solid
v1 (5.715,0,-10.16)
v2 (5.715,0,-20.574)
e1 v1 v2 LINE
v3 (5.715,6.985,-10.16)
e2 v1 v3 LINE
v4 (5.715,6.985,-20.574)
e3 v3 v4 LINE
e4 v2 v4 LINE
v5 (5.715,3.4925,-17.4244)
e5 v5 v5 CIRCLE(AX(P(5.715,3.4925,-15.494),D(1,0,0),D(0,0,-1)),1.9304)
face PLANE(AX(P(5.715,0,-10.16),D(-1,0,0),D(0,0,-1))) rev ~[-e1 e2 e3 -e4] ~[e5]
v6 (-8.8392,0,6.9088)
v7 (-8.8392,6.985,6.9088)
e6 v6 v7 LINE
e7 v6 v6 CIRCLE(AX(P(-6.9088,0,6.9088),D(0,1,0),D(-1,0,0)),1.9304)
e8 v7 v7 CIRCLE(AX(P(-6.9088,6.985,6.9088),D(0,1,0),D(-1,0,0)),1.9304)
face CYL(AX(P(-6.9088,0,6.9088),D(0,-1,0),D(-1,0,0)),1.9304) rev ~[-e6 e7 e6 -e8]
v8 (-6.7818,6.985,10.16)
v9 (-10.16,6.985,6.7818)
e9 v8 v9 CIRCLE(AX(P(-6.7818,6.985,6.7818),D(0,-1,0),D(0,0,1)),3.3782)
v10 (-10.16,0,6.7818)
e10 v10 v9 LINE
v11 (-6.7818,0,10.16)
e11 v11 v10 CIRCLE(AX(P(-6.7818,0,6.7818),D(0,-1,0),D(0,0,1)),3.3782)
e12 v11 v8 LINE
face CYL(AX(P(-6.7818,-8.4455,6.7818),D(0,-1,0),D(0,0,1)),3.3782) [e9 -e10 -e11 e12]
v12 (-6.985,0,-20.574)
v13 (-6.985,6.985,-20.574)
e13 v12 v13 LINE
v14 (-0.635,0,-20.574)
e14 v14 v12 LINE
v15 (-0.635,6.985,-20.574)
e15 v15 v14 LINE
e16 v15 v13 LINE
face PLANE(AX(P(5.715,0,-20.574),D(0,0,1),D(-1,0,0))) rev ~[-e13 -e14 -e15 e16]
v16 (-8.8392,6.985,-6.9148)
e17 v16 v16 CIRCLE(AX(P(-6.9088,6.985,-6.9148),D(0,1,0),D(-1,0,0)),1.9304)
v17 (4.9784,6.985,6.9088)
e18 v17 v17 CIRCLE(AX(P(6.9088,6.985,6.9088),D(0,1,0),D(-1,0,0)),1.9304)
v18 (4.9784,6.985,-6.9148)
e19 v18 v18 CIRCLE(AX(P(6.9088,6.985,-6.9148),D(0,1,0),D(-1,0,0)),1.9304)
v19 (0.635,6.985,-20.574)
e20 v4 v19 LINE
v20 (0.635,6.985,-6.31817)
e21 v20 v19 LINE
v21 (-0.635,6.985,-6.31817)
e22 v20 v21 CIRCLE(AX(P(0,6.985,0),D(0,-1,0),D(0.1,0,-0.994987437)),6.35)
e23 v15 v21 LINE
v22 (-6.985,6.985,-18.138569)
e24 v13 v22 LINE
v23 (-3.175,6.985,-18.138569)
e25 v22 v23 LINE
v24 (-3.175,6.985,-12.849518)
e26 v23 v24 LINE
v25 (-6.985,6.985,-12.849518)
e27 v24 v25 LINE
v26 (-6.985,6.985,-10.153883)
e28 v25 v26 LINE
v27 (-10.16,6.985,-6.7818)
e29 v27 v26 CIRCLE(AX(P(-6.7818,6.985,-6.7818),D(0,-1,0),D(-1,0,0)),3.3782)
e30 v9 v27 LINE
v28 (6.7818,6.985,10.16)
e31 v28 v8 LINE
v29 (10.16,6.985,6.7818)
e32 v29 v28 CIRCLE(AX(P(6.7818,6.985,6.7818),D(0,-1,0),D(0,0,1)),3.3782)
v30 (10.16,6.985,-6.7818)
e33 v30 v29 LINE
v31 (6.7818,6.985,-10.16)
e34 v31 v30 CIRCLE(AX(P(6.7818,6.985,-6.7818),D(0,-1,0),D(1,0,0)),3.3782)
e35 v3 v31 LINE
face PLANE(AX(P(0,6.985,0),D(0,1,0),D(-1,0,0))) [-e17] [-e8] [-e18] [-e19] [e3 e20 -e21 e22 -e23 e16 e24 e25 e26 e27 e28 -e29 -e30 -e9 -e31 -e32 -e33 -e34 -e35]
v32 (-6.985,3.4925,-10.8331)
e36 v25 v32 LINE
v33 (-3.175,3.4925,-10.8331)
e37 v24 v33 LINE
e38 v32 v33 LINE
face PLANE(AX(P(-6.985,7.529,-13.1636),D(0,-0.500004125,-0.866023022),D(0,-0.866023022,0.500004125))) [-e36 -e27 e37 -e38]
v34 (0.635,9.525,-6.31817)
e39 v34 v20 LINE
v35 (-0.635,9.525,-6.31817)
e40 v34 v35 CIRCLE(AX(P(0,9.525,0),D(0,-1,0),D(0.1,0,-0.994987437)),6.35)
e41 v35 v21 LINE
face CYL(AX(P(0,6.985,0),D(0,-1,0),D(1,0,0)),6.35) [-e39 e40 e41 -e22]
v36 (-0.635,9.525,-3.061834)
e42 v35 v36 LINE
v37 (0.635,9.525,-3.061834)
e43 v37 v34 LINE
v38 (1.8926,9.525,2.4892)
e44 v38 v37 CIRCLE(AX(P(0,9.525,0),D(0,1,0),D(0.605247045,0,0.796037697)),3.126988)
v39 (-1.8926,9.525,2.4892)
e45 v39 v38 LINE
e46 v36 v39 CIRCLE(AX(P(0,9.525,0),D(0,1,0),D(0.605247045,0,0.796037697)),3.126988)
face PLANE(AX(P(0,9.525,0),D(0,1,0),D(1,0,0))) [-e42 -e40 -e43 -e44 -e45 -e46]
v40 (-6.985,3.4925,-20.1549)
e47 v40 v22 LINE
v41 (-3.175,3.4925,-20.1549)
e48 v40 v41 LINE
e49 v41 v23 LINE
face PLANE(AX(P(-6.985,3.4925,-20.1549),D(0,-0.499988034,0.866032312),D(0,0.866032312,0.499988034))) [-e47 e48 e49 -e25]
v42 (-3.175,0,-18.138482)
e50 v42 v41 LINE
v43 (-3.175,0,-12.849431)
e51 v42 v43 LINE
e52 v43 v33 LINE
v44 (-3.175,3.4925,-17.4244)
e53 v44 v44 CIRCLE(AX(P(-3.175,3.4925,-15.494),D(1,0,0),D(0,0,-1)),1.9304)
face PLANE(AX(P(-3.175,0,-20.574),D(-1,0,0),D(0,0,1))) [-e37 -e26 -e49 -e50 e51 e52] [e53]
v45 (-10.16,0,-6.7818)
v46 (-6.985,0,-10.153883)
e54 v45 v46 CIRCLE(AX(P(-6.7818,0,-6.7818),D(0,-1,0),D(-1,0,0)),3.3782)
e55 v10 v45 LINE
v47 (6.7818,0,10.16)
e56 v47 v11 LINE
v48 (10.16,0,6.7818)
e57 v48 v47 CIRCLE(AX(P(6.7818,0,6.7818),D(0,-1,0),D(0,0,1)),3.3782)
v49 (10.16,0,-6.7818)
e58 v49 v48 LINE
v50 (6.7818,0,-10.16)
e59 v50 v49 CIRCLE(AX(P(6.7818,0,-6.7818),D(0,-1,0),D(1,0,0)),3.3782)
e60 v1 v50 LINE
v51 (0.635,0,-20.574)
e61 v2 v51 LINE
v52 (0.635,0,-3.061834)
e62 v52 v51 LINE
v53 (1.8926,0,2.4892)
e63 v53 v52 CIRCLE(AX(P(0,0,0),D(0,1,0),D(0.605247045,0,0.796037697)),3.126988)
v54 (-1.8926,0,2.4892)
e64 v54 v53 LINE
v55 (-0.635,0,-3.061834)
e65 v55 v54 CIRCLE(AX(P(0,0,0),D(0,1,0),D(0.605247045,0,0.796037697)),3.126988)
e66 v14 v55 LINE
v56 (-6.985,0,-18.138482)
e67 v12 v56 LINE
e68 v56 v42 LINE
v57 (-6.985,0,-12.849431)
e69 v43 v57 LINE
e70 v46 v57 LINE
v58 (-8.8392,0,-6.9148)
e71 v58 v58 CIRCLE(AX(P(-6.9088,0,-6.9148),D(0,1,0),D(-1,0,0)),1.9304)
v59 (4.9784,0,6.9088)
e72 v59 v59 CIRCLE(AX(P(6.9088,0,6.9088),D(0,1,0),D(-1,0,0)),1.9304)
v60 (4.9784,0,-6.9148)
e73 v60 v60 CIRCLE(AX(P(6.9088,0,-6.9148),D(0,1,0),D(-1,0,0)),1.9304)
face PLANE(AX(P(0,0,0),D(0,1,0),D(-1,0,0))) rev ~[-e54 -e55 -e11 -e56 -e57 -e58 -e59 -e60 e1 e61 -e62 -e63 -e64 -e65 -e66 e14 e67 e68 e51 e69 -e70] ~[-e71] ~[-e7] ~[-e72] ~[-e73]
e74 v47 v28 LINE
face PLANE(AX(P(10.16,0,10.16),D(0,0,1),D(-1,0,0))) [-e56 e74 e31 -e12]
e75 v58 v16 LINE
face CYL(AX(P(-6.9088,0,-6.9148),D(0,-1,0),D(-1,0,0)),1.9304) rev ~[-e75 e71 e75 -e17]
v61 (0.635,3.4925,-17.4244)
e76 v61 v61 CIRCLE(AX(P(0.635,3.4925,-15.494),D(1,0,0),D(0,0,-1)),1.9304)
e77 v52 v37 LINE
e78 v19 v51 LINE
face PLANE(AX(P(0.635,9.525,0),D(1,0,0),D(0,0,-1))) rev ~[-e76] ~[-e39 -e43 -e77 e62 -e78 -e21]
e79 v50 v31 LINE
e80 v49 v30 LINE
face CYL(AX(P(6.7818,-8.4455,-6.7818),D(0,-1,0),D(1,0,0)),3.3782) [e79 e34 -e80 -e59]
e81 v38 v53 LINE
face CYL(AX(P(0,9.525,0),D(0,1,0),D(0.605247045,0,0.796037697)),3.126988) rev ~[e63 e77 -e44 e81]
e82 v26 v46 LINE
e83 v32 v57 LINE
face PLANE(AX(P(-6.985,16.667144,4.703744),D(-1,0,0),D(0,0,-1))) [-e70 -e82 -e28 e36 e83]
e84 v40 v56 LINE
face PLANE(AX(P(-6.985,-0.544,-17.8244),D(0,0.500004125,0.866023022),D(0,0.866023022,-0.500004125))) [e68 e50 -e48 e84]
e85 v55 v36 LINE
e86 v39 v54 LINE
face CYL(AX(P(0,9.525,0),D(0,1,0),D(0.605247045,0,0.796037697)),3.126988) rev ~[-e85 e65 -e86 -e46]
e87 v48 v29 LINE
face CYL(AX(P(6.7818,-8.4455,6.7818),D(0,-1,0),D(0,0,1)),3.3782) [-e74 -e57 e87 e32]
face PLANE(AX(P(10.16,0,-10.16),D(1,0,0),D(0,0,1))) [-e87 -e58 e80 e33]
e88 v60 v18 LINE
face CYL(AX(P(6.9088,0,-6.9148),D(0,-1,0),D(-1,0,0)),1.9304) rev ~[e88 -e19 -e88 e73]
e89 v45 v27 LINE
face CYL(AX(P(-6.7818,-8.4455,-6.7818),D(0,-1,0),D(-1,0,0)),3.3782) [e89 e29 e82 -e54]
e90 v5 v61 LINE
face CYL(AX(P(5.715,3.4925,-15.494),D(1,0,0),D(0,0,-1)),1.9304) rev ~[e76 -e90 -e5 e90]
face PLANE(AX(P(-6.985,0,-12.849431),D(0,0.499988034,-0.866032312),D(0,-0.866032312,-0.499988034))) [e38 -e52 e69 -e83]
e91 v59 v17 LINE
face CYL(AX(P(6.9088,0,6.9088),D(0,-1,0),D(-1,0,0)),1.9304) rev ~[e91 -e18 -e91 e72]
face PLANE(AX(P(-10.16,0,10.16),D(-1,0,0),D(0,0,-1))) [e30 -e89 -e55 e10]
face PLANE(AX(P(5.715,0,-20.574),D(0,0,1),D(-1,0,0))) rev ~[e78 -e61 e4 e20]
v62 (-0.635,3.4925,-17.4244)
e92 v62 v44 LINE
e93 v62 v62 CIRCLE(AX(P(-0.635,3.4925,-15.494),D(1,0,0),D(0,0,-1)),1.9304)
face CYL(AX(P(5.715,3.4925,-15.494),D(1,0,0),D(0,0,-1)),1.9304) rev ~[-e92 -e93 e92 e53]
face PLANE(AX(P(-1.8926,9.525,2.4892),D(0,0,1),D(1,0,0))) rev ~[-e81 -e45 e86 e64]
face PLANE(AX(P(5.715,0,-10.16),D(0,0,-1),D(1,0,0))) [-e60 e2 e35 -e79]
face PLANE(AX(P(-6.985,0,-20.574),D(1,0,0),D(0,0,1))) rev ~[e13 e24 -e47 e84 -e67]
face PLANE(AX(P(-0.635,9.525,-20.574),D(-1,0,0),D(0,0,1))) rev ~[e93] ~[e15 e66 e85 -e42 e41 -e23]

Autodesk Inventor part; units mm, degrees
ref_plane "YZ Plane" through (0, 0, 0) normal (1, 0, 0) x (0, 1, 0)
ref_plane "XZ Plane" through (0, 0, 0) normal (0, 1, 0) x (-1, 0, 0)
ref_plane "XY Plane" through (0, 0, 0) normal (0, 0, 1) x (1, 0, 0)
sketch "Sketch1" plane through (0, 0, 0) normal (0, 1, 0) x (-1, 0, 0)
  line L0 (-10.16, 10.16) -> (10.16, 10.16)
  line L1 (10.16, 10.16) -> (10.16, -10.16)
  line L2 (-10.16, -10.16) -> (-10.16, 10.16)
  circle A0 centre (6.9088, -6.9148) radius 1.9304
  circle A1 centre (6.9088, 6.9088) radius 1.9304
  circle A2 centre (-6.9088, 6.9088) radius 1.9304
  circle A3 centre (-6.9088, -6.9148) radius 1.9304
  line L3 (-5.715, -10.16) -> (-5.715, -20.574)
  line L4 (-5.715, -20.574) -> (6.985, -20.574)
  line L5 (6.985, -20.574) -> (6.985, -10.16)
  line L6 (10.16, -10.16) -> (6.985, -10.16)
  line L7 (-5.715, -10.16) -> (-10.16, -10.16)
  point P0 (0, 0)
  dimension "d0" = 20.32
  dimension "d2" = 10.16
  dimension "d3" = 10.16
  dimension "d4" = 3.8608
  dimension "d5" = 6.9148
  dimension "d6" = 6.9088
  dimension "d7" = 3.8608
  dimension "d8" = 6.9088
  dimension "d9" = 6.9088
  dimension "d10" = 3.8608
  dimension "d11" = 6.9088
  dimension "d12" = 6.9088
  dimension "d13" = 3.8608
  dimension "d14" = 12.7
  dimension "d16" = 6.985
extrude "Extrusion1" add sketch "Sketch1" along normal blind 6.985
sketch "Sketch2" plane through (-6.985, 0, -20.574) normal (-1, 0, 0) x (0, 0, 1)
  circle A0 centre (5.08, 3.4925) radius 4.6609 construction
  line L0 (10.414, 0) -> (0, 0) projected
  line L1 (0, 0) -> (0, 6.985) projected
  line L2 (9.7409, 3.4925) -> (7.4105, -0.544)
  line L3 (7.4105, -0.544) -> (2.7496, -0.544)
  line L4 (2.7496, -0.544) -> (0.4191, 3.4925)
  line L5 (0.4191, 3.4925) -> (2.7495, 7.529)
  line L6 (2.7495, 7.529) -> (7.4104, 7.529)
  line L7 (7.4104, 7.529) -> (9.7409, 3.4925)
  point P0 (20.574, 0)
  dimension "d19" = 9.3218
  dimension "d20" = 3.4925
  dimension "d21" = 5.08
extrude "Extrusion2" cut sketch "Sketch2" against normal blind 3.81
sketch "Sketch3" plane through (5.715, 0, -10.16) normal (1, 0, 0) x (0, 0, -1)
  circle A0 centre (5.334, 3.4925) radius 1.9304
  line L0 (10.414, 0) -> (10.414, 6.985) projected
  line L1 (0, 6.985) -> (10.414, 6.985) projected
  point P0 (-10.16, 0)
  dimension "d24" = 3.8608
  dimension "d25" = 5.08
  dimension "d26" = 3.4925
extrude "Extrusion3" cut sketch "Sketch3" against normal through all
sketch "Sketch4" plane through (0, 6.985, 0) normal (0, 1, 0) x (1, 0, 0)
  circle A0 centre (0, 0) radius 6.35
  dimension "d29" = 12.7
extrude "Extrusion4" add sketch "Sketch4" along normal blind 2.54
sketch "Sketch5" plane through (0, 9.525, 0) normal (0, 1, 0) x (1, 0, 0)
  arc A0 (1.8926, -2.4892) -> (-1.8926, -2.4892) centre (0, 0) ccw
  line L0 (-1.8926, -2.4892) -> (1.8926, -2.4892)
  dimension "d32" = 6.254
  dimension "d33" = 2.4892
fillet "Fillet1" radius 3.3782 4 edges at (10.16, 3.4925, 10.16) (10.16, 3.4925, -10.16) (-10.16, 3.4925, 10.16) (-10.16, 3.4925, -10.16)
extrude "Extrusion5" cut sketch "Sketch5" against normal through all
sketch "Sketch6" plane through (0, 9.525, 0) normal (0, 1, 0) x (1, 0, 0)
  line L0 (-6.985, 20.574) -> (5.715, 20.574) projected
  line L1 (0.635, 0) -> (0.635, 20.574)
  line L2 (0.635, 20.574) -> (-0.635, 20.574)
  line L3 (-0.635, 20.574) -> (-0.635, 0)
  line L4 (-0.635, -20.574) -> (0.635, 20.574) construction
  line L5 (0.635, -20.574) -> (-0.635, 20.574) construction
  line L6 (-0.635, 0) -> (0.635, 0)
  point P0 (0, 0)
  dimension "d37" = 1.27
extrude "Extrusion6" cut sketch "Sketch6" against normal through all
properties part number "clamping hub 6mm to 8mm hub"
